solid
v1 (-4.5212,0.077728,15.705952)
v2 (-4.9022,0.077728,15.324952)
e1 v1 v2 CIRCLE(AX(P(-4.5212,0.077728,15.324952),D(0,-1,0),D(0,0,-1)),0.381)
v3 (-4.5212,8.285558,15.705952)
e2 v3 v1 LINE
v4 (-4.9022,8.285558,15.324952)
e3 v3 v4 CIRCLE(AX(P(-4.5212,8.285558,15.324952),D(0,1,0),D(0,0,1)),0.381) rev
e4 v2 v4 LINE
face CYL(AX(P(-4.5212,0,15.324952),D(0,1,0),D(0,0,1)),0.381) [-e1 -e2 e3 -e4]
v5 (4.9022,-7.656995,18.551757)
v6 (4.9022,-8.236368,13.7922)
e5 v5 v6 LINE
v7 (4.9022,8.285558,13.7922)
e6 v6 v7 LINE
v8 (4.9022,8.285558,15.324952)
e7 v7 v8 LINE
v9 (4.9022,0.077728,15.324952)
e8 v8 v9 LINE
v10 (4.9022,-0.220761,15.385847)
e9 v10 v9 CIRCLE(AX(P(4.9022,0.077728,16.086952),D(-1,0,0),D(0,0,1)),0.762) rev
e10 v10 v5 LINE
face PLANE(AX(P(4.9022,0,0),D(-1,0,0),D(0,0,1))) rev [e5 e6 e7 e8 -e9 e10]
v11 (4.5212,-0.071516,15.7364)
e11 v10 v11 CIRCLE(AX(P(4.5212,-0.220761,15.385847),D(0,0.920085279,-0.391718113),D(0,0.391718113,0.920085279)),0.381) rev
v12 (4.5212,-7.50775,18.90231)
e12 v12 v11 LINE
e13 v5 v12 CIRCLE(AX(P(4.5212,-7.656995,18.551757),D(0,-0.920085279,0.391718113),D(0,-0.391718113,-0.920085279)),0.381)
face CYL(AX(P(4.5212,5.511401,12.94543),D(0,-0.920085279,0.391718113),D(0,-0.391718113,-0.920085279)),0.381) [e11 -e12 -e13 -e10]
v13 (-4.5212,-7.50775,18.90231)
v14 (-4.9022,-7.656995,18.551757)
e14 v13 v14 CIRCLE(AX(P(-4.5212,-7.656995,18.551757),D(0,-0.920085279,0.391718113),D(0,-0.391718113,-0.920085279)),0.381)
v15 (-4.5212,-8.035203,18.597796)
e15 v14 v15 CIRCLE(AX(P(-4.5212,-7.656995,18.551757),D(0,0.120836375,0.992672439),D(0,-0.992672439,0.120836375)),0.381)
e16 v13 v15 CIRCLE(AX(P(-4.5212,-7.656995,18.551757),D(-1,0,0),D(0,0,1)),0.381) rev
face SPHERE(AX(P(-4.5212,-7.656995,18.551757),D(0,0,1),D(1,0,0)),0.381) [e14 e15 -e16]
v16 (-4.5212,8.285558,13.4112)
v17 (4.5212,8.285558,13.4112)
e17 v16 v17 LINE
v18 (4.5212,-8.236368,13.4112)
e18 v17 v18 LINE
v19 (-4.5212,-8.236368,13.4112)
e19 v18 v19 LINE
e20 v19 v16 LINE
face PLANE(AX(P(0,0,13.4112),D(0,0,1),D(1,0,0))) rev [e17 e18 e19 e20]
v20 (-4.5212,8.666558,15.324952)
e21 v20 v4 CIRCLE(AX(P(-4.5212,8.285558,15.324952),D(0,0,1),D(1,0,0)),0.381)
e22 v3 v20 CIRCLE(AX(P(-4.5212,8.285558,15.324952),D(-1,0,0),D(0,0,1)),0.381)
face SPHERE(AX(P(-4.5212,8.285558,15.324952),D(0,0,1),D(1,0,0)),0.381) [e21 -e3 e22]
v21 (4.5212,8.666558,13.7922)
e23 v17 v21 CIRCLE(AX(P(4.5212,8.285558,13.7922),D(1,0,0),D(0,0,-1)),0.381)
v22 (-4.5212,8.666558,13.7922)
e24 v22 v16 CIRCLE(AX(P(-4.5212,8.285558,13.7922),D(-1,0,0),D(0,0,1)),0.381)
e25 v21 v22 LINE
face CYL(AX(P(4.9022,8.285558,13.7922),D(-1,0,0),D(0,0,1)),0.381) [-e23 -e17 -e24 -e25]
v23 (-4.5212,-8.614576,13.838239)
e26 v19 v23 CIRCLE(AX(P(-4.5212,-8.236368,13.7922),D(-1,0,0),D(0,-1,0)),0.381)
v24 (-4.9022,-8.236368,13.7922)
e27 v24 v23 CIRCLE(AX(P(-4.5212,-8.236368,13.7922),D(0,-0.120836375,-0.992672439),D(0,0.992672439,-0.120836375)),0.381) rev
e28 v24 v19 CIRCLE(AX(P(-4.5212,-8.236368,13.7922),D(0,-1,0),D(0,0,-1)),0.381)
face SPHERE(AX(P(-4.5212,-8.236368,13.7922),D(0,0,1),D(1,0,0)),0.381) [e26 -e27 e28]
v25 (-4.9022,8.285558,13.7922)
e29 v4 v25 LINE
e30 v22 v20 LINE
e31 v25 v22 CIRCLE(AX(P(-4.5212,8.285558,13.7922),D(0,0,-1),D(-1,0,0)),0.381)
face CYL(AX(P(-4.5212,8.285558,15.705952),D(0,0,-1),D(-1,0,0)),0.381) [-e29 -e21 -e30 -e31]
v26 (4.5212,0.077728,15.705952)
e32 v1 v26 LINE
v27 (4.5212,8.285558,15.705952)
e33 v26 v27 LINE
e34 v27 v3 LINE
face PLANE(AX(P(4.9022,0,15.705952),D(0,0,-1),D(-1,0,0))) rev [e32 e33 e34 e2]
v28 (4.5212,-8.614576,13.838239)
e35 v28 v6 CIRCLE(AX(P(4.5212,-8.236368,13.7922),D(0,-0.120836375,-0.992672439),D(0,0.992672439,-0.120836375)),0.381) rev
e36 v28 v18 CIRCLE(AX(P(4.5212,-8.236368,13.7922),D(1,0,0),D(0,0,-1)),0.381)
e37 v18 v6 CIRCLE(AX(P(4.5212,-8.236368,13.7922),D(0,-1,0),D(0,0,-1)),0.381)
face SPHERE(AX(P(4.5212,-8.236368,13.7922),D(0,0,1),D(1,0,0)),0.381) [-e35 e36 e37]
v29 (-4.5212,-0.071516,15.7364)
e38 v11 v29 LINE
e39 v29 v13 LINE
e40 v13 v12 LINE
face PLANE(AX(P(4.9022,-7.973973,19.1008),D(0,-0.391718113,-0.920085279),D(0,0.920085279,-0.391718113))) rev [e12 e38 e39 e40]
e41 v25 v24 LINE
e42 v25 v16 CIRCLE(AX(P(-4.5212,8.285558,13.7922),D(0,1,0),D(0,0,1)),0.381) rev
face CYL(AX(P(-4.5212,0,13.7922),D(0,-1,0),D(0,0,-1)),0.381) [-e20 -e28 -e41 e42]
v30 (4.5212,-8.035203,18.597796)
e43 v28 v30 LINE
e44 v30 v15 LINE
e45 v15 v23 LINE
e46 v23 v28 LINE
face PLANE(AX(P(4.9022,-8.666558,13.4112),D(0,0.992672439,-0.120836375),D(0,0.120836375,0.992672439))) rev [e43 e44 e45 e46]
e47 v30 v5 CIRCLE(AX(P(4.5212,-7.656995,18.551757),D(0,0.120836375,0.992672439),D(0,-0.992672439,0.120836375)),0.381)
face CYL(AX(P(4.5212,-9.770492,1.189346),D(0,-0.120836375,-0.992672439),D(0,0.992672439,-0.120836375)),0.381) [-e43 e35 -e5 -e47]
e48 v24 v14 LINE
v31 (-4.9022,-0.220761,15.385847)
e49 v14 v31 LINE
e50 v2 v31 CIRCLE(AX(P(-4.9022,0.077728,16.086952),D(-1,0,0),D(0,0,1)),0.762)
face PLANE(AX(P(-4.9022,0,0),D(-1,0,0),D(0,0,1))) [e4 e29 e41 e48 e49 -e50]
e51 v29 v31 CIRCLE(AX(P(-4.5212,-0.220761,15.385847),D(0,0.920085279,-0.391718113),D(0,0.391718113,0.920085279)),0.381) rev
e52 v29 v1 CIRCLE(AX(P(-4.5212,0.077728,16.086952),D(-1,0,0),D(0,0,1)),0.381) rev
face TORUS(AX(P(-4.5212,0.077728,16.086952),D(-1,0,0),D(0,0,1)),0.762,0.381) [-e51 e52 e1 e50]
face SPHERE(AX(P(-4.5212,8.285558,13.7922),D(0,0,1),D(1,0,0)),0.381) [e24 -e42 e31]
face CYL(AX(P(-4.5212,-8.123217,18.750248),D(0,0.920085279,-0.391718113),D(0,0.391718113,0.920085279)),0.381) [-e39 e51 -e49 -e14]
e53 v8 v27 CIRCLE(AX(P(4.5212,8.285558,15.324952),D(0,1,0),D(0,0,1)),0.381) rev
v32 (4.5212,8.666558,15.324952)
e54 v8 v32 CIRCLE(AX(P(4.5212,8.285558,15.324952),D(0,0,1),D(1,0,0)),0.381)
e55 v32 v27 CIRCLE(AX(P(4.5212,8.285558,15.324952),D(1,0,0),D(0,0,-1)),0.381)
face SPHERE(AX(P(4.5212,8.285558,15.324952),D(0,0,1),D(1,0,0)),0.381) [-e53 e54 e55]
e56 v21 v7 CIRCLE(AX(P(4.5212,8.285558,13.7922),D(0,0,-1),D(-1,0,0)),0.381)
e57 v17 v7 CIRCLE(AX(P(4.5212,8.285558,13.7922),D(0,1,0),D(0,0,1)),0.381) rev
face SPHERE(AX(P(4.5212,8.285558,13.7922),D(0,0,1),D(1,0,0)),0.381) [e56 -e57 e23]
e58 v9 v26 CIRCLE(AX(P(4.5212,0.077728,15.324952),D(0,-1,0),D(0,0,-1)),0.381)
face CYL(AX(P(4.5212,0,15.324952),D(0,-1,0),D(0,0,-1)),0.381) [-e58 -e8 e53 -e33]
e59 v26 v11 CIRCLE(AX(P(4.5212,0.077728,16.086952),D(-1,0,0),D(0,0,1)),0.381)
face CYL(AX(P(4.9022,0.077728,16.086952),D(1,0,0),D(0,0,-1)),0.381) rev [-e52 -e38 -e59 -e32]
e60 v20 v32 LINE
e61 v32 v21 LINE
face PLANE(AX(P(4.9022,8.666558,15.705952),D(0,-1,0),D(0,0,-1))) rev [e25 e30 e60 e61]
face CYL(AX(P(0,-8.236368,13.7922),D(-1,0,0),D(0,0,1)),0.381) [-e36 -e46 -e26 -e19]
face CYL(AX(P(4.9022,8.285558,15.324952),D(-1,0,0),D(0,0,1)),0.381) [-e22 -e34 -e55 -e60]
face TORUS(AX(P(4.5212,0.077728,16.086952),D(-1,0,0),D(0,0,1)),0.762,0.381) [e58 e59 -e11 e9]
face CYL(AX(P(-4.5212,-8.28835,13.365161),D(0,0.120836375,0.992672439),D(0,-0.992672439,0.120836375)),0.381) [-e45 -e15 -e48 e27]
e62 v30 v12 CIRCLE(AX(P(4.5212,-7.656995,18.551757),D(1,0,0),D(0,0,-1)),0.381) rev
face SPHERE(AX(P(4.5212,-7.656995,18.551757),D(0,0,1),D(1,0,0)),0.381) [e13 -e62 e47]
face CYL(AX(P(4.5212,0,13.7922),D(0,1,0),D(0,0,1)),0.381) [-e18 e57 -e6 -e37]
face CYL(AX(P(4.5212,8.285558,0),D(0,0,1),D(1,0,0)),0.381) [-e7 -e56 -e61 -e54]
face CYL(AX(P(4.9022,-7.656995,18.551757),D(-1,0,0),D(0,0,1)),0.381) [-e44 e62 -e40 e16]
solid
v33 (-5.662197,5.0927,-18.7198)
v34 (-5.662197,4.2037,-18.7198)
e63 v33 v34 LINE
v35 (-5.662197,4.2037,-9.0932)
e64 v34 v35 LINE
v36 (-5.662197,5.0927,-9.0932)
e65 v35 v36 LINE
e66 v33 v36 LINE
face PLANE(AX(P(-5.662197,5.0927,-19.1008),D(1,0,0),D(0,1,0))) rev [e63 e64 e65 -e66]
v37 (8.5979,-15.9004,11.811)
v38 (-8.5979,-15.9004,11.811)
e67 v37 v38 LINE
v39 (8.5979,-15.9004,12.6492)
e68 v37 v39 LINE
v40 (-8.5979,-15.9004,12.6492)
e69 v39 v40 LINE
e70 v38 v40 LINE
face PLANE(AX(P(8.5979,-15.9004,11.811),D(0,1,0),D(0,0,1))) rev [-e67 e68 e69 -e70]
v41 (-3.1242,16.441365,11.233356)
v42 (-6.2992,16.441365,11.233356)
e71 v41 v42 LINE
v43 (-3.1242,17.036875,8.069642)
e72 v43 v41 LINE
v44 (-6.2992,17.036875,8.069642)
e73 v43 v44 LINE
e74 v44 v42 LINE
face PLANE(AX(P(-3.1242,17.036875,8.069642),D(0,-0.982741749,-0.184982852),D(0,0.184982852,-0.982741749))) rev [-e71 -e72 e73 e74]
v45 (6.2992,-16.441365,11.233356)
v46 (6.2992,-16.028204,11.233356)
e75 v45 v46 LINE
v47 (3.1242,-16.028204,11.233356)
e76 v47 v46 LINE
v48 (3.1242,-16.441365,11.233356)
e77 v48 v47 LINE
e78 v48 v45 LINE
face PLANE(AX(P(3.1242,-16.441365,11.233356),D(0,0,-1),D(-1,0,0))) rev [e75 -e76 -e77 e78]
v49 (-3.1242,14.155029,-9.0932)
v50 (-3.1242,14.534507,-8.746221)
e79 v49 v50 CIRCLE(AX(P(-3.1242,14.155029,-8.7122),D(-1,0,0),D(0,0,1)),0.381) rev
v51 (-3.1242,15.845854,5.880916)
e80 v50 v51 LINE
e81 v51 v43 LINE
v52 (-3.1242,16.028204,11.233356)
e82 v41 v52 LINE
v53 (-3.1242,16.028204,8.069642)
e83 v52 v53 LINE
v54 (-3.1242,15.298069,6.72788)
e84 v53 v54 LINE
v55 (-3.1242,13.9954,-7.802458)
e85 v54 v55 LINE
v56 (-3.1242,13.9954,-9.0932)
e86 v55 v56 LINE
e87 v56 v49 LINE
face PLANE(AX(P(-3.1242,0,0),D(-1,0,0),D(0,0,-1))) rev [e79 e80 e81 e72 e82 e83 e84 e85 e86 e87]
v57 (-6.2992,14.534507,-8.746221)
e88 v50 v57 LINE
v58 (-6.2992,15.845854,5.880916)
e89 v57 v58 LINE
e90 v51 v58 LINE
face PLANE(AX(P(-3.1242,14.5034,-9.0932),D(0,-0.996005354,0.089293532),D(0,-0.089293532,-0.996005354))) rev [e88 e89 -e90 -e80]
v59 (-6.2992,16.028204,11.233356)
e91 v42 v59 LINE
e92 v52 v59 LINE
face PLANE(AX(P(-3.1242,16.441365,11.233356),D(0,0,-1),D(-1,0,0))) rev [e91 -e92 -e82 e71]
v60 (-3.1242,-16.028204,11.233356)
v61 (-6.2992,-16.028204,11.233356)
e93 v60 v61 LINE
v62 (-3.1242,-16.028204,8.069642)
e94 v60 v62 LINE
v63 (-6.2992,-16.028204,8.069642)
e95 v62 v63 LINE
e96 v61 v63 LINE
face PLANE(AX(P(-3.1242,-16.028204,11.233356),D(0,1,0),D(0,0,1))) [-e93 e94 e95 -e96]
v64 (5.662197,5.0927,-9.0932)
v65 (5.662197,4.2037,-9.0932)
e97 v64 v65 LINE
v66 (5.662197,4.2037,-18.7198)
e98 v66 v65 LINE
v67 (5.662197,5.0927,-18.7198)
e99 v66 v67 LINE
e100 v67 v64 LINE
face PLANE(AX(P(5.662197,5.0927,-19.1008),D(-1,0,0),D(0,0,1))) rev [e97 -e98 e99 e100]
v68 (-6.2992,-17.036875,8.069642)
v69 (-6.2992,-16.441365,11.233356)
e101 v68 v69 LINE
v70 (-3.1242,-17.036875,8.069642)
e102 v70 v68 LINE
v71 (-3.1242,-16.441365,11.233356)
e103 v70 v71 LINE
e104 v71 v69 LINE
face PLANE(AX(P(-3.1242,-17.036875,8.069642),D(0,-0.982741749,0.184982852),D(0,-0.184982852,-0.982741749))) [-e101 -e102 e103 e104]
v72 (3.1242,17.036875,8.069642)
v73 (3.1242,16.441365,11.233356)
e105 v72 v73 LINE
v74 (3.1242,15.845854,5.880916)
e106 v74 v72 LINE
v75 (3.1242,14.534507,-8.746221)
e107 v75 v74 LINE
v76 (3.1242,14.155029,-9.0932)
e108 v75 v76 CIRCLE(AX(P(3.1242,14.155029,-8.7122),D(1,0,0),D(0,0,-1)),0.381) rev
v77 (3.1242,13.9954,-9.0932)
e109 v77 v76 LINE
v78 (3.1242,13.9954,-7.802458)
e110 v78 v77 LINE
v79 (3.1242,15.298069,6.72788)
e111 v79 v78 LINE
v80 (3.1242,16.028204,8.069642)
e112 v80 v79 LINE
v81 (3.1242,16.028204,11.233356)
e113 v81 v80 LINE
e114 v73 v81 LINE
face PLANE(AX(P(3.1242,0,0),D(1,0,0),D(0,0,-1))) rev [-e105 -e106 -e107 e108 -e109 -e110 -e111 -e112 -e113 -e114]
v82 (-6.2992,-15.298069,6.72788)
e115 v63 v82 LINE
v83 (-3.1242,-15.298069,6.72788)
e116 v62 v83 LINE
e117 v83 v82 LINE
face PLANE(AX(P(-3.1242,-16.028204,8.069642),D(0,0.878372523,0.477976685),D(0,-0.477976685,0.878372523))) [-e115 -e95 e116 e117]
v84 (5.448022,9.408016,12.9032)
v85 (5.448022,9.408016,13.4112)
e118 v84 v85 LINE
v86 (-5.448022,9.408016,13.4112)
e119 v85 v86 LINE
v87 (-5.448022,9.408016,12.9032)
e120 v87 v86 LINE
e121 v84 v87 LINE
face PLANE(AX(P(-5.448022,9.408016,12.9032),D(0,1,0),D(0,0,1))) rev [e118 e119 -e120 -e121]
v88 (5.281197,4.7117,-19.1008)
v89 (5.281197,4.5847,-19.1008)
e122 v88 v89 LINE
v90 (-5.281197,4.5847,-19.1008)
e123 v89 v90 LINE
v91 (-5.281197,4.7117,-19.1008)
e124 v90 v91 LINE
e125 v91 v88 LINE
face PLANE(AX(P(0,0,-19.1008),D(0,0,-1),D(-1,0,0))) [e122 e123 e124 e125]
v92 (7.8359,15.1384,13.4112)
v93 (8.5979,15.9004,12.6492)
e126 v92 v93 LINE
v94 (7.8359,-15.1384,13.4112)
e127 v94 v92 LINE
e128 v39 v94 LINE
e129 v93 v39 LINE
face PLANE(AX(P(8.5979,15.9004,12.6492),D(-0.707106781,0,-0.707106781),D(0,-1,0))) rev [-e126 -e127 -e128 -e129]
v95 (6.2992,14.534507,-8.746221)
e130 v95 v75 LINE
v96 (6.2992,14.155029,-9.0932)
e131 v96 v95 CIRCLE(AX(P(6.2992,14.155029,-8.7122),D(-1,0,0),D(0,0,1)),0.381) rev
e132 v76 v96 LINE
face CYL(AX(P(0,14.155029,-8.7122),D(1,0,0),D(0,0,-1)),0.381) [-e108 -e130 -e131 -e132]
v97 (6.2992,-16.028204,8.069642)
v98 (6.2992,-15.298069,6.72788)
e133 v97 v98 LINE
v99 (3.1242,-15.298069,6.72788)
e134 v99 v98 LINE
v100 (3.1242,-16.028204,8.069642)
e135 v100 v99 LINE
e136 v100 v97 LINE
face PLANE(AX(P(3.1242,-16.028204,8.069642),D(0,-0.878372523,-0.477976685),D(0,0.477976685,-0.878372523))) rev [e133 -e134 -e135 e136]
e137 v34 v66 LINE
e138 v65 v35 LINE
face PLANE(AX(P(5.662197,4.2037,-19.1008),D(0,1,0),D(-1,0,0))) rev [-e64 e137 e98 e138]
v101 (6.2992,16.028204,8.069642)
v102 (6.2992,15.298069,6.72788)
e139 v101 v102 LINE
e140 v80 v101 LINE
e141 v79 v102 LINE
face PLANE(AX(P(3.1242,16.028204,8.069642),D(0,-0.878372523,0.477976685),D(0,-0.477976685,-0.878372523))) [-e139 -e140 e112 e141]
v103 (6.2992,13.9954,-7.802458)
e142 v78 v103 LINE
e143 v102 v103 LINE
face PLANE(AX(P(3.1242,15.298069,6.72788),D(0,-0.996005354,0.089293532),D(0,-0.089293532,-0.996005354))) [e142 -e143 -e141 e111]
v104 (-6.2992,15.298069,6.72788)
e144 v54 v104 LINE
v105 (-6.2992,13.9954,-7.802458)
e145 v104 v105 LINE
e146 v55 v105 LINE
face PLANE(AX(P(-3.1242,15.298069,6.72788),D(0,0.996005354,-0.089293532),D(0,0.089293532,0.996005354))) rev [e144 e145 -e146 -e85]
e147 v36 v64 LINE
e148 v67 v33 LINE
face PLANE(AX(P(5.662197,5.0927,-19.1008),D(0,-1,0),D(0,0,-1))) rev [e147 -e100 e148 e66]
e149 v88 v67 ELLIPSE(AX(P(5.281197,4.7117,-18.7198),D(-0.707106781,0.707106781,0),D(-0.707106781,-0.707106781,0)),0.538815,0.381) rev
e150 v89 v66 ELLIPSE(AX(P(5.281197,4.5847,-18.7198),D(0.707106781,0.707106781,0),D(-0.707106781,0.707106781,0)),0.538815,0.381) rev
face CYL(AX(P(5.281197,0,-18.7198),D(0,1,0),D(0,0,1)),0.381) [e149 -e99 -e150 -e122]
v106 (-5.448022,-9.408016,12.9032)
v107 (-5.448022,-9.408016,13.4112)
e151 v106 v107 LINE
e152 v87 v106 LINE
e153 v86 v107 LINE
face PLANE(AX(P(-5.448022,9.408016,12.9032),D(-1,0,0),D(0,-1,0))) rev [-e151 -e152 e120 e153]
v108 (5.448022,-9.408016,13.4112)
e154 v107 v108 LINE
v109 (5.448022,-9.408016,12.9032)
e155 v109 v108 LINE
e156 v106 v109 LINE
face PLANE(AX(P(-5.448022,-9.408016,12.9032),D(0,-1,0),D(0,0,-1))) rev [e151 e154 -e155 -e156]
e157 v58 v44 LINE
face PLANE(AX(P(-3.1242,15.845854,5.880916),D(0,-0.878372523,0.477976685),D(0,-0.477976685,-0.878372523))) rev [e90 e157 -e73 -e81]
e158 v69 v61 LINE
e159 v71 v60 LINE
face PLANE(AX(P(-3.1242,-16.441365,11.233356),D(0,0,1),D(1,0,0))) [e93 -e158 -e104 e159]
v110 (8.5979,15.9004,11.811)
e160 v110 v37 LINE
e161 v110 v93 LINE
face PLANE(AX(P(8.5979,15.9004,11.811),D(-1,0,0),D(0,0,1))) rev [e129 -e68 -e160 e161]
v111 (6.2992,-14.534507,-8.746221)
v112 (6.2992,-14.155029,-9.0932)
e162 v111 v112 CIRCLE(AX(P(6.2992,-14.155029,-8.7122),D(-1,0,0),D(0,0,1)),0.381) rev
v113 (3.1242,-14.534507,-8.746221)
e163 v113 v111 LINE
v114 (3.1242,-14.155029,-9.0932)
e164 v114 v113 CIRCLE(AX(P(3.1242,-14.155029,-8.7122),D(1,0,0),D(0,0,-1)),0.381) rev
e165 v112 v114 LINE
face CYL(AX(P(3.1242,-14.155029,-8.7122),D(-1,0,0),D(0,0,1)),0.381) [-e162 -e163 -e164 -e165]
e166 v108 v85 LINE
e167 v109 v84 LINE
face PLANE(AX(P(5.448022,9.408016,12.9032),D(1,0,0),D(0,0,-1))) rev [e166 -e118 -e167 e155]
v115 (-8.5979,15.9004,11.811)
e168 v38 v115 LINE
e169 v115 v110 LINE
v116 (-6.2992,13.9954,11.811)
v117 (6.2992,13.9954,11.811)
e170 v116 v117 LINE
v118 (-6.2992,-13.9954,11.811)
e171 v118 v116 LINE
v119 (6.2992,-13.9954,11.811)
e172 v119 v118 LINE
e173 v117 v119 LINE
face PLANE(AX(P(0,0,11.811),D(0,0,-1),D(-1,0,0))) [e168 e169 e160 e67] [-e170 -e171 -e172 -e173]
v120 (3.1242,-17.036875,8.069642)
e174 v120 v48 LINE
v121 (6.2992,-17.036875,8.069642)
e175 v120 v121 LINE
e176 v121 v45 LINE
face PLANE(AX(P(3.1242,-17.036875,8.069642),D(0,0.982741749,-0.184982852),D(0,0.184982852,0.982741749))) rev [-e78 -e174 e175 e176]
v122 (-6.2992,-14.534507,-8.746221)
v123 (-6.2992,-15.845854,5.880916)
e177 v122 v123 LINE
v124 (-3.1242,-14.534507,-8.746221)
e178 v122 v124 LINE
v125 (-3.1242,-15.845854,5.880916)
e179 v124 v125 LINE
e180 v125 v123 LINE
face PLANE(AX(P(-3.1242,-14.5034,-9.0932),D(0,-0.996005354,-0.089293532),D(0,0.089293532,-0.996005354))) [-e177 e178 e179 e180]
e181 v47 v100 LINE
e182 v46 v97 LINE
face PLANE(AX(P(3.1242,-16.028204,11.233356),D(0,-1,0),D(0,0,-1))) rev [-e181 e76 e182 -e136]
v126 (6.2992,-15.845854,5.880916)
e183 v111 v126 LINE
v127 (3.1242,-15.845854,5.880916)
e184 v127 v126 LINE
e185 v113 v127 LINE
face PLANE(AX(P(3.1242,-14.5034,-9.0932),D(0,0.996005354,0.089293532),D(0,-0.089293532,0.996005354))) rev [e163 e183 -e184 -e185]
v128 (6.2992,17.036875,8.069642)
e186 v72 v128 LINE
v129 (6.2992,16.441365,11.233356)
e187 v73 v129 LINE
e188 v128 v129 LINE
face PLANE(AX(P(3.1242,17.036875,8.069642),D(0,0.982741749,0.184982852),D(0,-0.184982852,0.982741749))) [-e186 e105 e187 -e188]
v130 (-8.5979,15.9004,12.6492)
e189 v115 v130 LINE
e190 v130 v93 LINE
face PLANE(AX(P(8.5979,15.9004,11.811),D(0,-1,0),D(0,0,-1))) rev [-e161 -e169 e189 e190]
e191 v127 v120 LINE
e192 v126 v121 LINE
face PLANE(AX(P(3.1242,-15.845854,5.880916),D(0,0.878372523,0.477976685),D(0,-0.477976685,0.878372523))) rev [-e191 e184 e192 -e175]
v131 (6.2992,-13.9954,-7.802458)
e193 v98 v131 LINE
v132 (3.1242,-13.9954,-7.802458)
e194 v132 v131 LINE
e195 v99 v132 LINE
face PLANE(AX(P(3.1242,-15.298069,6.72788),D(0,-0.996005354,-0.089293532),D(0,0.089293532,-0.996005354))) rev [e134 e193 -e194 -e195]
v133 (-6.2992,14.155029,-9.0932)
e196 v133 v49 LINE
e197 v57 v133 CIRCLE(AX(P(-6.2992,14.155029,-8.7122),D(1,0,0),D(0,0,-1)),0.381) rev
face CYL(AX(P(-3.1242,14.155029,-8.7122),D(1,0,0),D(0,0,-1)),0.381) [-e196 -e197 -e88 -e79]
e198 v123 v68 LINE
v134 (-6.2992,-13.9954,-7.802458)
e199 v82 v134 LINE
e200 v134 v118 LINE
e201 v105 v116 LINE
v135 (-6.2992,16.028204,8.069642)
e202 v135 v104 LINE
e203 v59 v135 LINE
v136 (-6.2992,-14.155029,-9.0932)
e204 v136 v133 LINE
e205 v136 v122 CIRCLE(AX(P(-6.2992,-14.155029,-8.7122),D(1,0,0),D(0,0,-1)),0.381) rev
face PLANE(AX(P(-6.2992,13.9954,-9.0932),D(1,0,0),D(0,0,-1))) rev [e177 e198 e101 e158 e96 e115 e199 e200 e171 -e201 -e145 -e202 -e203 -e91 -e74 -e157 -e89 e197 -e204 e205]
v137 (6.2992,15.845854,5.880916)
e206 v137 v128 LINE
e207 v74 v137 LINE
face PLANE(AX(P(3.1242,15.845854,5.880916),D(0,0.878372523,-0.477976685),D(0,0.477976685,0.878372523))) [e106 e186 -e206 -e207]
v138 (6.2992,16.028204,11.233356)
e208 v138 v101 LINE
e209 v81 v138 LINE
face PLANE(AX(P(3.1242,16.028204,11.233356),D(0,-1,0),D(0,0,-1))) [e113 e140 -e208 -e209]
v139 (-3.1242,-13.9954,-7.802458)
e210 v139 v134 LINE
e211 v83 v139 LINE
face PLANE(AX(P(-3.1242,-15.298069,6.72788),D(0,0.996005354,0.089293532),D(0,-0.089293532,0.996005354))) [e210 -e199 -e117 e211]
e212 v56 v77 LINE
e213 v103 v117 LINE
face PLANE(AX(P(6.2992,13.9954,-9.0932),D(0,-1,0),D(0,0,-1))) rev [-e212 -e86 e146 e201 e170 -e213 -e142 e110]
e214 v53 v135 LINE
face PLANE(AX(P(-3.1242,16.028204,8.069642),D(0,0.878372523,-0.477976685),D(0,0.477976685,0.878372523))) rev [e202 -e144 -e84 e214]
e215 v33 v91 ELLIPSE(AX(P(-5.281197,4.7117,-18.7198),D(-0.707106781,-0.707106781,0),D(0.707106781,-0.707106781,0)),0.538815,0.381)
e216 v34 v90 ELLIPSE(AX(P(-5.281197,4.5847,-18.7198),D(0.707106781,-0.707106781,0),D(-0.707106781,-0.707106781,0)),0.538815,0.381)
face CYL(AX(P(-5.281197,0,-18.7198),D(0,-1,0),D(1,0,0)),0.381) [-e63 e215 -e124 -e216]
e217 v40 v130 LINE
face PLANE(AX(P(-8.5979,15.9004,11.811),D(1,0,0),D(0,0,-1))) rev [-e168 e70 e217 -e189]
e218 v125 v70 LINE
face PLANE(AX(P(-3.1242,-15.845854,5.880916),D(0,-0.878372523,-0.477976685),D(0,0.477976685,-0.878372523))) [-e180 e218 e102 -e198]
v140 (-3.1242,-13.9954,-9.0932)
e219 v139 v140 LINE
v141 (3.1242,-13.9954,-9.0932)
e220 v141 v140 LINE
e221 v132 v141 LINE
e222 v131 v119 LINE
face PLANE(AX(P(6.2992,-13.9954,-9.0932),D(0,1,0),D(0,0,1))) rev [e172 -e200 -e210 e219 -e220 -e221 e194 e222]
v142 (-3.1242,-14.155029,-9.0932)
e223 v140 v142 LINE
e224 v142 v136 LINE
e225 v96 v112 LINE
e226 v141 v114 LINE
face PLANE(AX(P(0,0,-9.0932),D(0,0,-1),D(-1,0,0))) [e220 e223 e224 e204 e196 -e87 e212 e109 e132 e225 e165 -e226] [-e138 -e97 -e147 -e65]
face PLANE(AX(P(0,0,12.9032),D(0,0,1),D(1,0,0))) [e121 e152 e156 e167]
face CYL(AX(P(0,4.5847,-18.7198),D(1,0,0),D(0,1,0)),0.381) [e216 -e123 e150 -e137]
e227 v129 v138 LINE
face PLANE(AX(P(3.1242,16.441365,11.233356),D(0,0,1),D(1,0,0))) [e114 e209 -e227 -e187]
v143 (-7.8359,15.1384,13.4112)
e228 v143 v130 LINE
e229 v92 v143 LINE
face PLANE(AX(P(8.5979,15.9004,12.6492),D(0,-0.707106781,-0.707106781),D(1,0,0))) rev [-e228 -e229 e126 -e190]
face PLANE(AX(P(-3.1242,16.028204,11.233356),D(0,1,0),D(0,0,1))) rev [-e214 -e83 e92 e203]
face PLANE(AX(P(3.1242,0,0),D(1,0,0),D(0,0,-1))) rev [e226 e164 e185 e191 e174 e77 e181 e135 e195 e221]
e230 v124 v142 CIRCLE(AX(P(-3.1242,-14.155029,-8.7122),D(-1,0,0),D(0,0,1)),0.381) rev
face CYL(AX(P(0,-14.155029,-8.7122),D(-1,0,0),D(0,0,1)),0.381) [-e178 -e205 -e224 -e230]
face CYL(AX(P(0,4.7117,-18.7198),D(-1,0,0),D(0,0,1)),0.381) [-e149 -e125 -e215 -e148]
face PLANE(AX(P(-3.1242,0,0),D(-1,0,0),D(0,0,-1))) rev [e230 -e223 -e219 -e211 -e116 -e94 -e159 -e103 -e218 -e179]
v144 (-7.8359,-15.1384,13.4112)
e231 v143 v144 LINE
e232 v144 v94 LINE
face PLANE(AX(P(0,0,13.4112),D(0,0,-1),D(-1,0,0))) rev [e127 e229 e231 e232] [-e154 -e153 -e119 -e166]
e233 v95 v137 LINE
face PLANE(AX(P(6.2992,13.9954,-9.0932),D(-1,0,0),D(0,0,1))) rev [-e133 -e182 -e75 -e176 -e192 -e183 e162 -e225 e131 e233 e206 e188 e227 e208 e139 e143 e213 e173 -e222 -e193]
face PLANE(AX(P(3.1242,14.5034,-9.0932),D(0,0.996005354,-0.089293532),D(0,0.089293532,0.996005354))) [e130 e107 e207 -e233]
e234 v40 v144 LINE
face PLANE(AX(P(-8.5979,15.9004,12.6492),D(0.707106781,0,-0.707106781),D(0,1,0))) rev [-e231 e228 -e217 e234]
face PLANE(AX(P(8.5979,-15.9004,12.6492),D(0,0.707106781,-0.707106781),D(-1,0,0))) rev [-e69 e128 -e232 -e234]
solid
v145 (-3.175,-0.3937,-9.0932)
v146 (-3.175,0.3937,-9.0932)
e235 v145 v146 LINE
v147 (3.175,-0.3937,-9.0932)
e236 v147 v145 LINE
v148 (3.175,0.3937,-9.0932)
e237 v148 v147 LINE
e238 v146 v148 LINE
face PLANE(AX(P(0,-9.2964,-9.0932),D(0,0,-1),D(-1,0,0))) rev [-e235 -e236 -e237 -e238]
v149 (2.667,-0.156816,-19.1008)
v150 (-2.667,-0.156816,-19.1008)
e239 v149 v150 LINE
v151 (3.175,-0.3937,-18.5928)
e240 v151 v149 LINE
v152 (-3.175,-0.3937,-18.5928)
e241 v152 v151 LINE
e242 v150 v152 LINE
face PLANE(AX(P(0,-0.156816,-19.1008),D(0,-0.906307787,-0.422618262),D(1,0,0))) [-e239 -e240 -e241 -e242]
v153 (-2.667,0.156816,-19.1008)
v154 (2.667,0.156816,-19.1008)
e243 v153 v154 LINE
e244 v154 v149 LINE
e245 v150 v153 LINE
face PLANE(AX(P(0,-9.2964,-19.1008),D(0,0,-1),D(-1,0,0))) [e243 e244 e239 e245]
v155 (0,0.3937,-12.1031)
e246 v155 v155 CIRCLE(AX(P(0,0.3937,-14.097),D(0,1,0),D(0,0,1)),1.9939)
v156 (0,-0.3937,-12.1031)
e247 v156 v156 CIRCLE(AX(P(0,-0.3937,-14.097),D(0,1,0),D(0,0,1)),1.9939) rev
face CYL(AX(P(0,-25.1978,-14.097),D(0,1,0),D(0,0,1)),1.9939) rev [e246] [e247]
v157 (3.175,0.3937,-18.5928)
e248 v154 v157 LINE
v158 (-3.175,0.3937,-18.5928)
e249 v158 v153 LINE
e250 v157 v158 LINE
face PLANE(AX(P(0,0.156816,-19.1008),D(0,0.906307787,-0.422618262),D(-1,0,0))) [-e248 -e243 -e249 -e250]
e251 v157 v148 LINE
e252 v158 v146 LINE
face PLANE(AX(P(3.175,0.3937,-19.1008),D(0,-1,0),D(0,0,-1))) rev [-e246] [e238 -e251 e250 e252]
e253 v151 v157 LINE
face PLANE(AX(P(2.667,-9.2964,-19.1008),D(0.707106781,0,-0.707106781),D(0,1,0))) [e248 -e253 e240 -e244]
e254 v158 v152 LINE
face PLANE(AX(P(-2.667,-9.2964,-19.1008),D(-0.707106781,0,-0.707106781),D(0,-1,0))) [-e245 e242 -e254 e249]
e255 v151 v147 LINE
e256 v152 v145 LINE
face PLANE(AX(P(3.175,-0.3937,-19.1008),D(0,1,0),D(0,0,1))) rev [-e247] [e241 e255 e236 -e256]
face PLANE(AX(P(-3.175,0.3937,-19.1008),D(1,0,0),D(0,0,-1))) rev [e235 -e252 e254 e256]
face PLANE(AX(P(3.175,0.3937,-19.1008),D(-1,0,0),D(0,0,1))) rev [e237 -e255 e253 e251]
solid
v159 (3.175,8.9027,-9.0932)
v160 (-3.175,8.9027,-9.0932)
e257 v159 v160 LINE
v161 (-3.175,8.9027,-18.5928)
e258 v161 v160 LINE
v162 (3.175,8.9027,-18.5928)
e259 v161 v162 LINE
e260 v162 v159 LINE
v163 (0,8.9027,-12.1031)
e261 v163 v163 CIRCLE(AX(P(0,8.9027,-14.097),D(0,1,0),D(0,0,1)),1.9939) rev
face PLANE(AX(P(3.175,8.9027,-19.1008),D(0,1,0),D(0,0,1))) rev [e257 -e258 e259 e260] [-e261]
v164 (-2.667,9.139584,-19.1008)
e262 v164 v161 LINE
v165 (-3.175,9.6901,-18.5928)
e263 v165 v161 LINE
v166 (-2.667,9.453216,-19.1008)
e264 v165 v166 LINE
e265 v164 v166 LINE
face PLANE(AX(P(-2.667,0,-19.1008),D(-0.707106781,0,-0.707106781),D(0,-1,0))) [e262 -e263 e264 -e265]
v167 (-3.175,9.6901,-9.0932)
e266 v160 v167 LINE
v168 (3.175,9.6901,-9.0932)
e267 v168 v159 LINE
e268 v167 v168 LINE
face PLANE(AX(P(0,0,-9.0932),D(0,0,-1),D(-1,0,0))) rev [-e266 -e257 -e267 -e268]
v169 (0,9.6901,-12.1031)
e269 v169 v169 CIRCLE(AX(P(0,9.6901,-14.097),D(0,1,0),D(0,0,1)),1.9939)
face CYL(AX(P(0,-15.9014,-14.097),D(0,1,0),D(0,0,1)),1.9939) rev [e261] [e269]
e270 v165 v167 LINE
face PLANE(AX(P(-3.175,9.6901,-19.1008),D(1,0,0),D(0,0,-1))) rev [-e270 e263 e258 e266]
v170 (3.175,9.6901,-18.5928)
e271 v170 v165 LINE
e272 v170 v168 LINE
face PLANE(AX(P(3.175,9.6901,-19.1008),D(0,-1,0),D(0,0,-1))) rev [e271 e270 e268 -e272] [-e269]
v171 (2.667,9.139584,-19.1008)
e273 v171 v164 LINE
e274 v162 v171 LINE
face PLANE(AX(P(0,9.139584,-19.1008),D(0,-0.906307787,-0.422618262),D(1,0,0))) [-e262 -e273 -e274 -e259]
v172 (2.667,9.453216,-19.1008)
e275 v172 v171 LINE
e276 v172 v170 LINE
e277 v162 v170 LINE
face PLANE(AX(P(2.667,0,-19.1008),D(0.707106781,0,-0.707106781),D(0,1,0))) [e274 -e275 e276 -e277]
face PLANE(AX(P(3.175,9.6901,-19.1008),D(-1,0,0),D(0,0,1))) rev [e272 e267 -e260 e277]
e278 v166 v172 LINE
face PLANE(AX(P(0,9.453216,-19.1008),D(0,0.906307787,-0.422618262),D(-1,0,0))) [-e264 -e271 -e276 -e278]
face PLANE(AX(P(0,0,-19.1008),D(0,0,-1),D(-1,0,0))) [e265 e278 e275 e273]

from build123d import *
from OCP.BRepFilletAPI import BRepFilletAPI_MakeChamfer

# Parameters (mm, degrees)
BOSS_EXTRUDE1_DEPTH  = 4.9022
SKETCH3_W            = 17.1958
SKETCH3_H            = 31.8008
BOSS_EXTRUDE2_DEPTH  = 1.6002
CHAMFER1_SIZE        = 0.762
SKETCH4_W            = 10.896044092
SKETCH4_H            = 18.816032884
CUT_EXTRUDE2_DEPTH   = 0.508
SKETCH5_W            = 12.5984
SKETCH5_H            = 27.9908
BOSS_EXTRUDE3_DEPTH  = 20.9042
SKETCH6_W            = 6.35
SKETCH6_H            = 0.7874
BOSS_EXTRUDE4_DEPTH  = 10.0076
CHAMFER2_SIZE        = 0.508
CHAMFER3_SIZE        = 0.508
CHAMFER3_SIZE2       = 0.23688429
SKETCH7_R            = 1.9939
CUT_EXTRUDE3_DEPTH   = 0.7874
LPATTERN1_COUNT      = 2
LPATTERN1_PITCH      = 9.2964
SKETCH9_W            = 11.324393704
SKETCH9_H            = 0.889
BOSS_EXTRUDE5_DEPTH  = 10.0076
FILLET1_R            = 0.381
BOSS_EXTRUDE6_DEPTH  = 3.175
FILLET2_R            = 0.381
FILLET2_OF_MIRROR3_R = 0.381
MIRROR4_START        = -6.2992
MIRROR4_DEPTH        = 3.175
MIRROR4_START_2      = 3.1242
MIRROR4_2_DEPTH      = 3.175
FILLET3_R            = 0.381


# Read off the part's stored shape, not the designer's step: Mirror4
with BuildPart() as part:
    # Sketch2 → Boss-Extrude1 (new, symmetric)
    with BuildSketch(Plane(origin=(0, 0, 0), x_dir=(0, 0, -1), z_dir=(1, 0, 0))):
        Polygon((-19.1008, -7.973972857), (-15.705952073, 0), (-15.705952073, 8.666558462), (-13.4112, 8.666558462), (-13.4112, -8.666558462), align=None)
    extrude(amount=BOSS_EXTRUDE1_DEPTH, both=True)

    # Sketch3 → Boss-Extrude2 (add)
    with BuildSketch(Plane(origin=(0, 0, 13.4112), x_dir=(-1, 0, 0), z_dir=(0, 0, -1))):
        Rectangle(SKETCH3_W, SKETCH3_H)
    extrude(amount=BOSS_EXTRUDE2_DEPTH)

    # Chamfer1
    chamfer1_edges = [part.edges().sort_by_distance(p)[0] for p in [
        (-8.5979, 0, 13.4112),
        (0, 15.9004, 13.4112),
        (8.5979, 0, 13.4112),
        (0, -15.9004, 13.4112),
    ]]
    chamfer(chamfer1_edges, length=CHAMFER1_SIZE)

    # Sketch4 → Cut-Extrude2 (cut)
    with BuildSketch(Plane.XY.offset(13.4112)):
        Rectangle(SKETCH4_W, SKETCH4_H)
    extrude(amount=-CUT_EXTRUDE2_DEPTH, mode=Mode.SUBTRACT)


with BuildPart() as cut_extrude2_piece_1:
    # of the separate pieces the step leaves, piece 1, a body of its own (cut_extrude2_pieces)
    add(part.part.solids().sort_by_distance((8.5979, 15.9004, 12.6492))[0])

    # Sketch5 → Boss-Extrude3 (add)
    with BuildSketch(Plane(origin=(0, 0, 11.811), x_dir=(-1, 0, 0), z_dir=(0, 0, -1))):
        Rectangle(SKETCH5_W, SKETCH5_H)
    extrude(amount=BOSS_EXTRUDE3_DEPTH)

    # Sketch9 → Boss-Extrude5 (add)
    with BuildSketch(Plane(origin=(0, 0, -9.0932), x_dir=(-1, 0, 0), z_dir=(0, 0, -1))):
        with Locations((0, 4.6482)):
            Rectangle(SKETCH9_W, SKETCH9_H)
    extrude(amount=BOSS_EXTRUDE5_DEPTH)

    # Fillet1
    fillet1_edges = [cut_extrude2_piece_1.edges().sort_by_distance(p)[0] for p in [
        (-5.662196852, 4.6482, -19.1008),
        (0, 5.0927, -19.1008),
        (5.662196852, 4.6482, -19.1008),
        (0, 4.2037, -19.1008),
    ]]
    fillet(fillet1_edges, radius=FILLET1_R)

    # Sketch11 → Boss-Extrude6 (add)
    with BuildSketch(Plane(origin=(6.2992, 0, 0), x_dir=(0, 0, -1), z_dir=(1, 0, 0))):
        Polygon((9.0932, 13.9954), (9.0932, 14.5034), (-5.880915867, 15.845854324), (-8.069641774, 17.036875135), (-11.233356301, 16.44136473), (-11.233356301, 16.028204475), (-8.069641774, 16.028204475), (-6.727879648, 15.298068915), (7.80245849, 13.9954), align=None)
    boss_extrude6 = extrude(amount=-BOSS_EXTRUDE6_DEPTH)

    # Fillet2
    fillet2_edges = [cut_extrude2_piece_1.edges().sort_by_distance(p)[0] for p in [
        (4.7117, 14.5034, -9.0932),
    ]]
    fillet(fillet2_edges, radius=FILLET2_R)

    # Mirror3: Boss-Extrude6 across plane
    add(boss_extrude6.mirror(Plane(origin=(0, 0, 0), x_dir=(0, 0, 1), z_dir=(1, 0, 0))))

    # Fillet2 of Mirror3
    fillet2_of_mirror3_edges = [cut_extrude2_piece_1.edges().sort_by_distance(p)[0] for p in [
        (-4.7117, 14.5034, -9.0932),
    ]]
    fillet(fillet2_of_mirror3_edges, radius=FILLET2_OF_MIRROR3_R)

    # Mirror4 outline → Mirror4 (add)
    with BuildSketch(Plane.YZ.offset(MIRROR4_START)):
        with BuildLine():
            Line((-16.028204475, 8.069641774), (-16.028204475, 11.233356301))
            Line((-16.028204475, 11.233356301), (-16.44136473, 11.233356301))
            Line((-16.44136473, 11.233356301), (-17.036875135, 8.069641774))
            Line((-17.036875135, 8.069641774), (-15.845854324, 5.880915867))
            Line((-15.845854324, 5.880915867), (-14.534507258, -8.746220836))
            ThreePointArc((-14.534507258, -8.746220836), (-14.412127508, -8.993378714), (-14.155029218, -9.0932))
            Line((-14.155029218, -9.0932), (-13.9954, -9.0932))
            Line((-13.9954, -9.0932), (-13.9954, -7.80245849))
            Line((-13.9954, -7.80245849), (-15.298068915, 6.727879648))
            Line((-15.298068915, 6.727879648), (-16.028204475, 8.069641774))
        make_face()
    extrude(amount=MIRROR4_DEPTH)

    # Mirror4 2 outline → Mirror4 2 (add)
    with BuildSketch(Plane.YZ.offset(MIRROR4_START_2)):
        with BuildLine():
            Line((-16.028204475, 8.069641774), (-16.028204475, 11.233356301))
            Line((-16.028204475, 11.233356301), (-16.44136473, 11.233356301))
            Line((-16.44136473, 11.233356301), (-17.036875135, 8.069641774))
            Line((-17.036875135, 8.069641774), (-15.845854324, 5.880915867))
            Line((-15.845854324, 5.880915867), (-14.534507258, -8.746220836))
            ThreePointArc((-14.534507258, -8.746220836), (-14.412127508, -8.993378714), (-14.155029218, -9.0932))
            Line((-14.155029218, -9.0932), (-13.9954, -9.0932))
            Line((-13.9954, -9.0932), (-13.9954, -7.80245849))
            Line((-13.9954, -7.80245849), (-15.298068915, 6.727879648))
            Line((-15.298068915, 6.727879648), (-16.028204475, 8.069641774))
        make_face()
    extrude(amount=MIRROR4_2_DEPTH)


with BuildPart() as cut_extrude2_piece_2:
    # of the separate pieces the step leaves, piece 2, a body of its own (cut_extrude2_pieces)
    add(part.part.solids().sort_by_distance((-4.9022, 8.666558462, 15.705952073))[0])

    # Fillet3
    fillet3_edges = [cut_extrude2_piece_2.edges().sort_by_distance(p)[0] for p in [
        (4.9022, 8.666558462, 14.558576037),
        (4.9022, 4.333279231, 15.705952073),
        (4.9022, -3.986986428, 17.403376037),
        (4.9022, -8.320265659, 16.256),
        (-4.9022, -3.986986428, 17.403376037),
        (-4.9022, 4.333279231, 15.705952073),
        (-4.9022, 8.666558462, 14.558576037),
        (-4.9022, 0, 13.4112),
        (-4.9022, -8.320265659, 16.256),
        (4.9022, 0, 13.4112),
        (0, -7.973972857, 19.1008),
        (0, 0, 15.705952073),
        (0, 8.666558462, 15.705952073),
        (0, 8.666558462, 13.4112),
        (0, -8.666558462, 13.4112),
    ]]
    fillet(fillet3_edges, radius=FILLET3_R)


with BuildPart() as body_3:
    # Sketch6 → Boss-Extrude4 (new body)
    with BuildSketch(Plane(origin=(0, 0, -9.0932), x_dir=(-1, 0, 0), z_dir=(0, 0, -1))):
        with Locations((0, 9.2964)):
            Rectangle(SKETCH6_W, SKETCH6_H)
    extrude(amount=BOSS_EXTRUDE4_DEPTH)

    # Chamfer2
    chamfer2_edges = [body_3.edges().sort_by_distance(p)[0] for p in [
        (3.175, 9.2964, -19.1008),
        (-3.175, 9.2964, -19.1008),
    ]]
    chamfer(chamfer2_edges, length=CHAMFER2_SIZE)

    # Chamfer3: one chamfer whose edges measure the first distance from different faces: ONE call of the kernel's chamfer builder (chamfer() names one face for all edges)
    chamfer3_edges_1 = [body_3.edges().sort_by_distance(p)[0] for p in [
        (0, 8.9027, -19.1008),
    ]]
    chamfer3_side_1 = [body_3.faces().sort_by_distance(p)[0] for p in [
        (0, 8.9027, -14.077287598),
    ]]
    chamfer3_edges_2 = [body_3.edges().sort_by_distance(p)[0] for p in [
        (0, 9.6901, -19.1008),
    ]]
    chamfer3_side_2 = [body_3.faces().sort_by_distance(p)[0] for p in [
        (0, 9.6901, -14.077287598),
    ]]
    chamfer3 = BRepFilletAPI_MakeChamfer(body_3.part.solid().wrapped)
    for e in chamfer3_edges_1:
        chamfer3.Add(CHAMFER3_SIZE, CHAMFER3_SIZE2, e.wrapped, chamfer3_side_1[0].wrapped)  # the first distance lies on this face
    for e in chamfer3_edges_2:
        chamfer3.Add(CHAMFER3_SIZE, CHAMFER3_SIZE2, e.wrapped, chamfer3_side_2[0].wrapped)  # the first distance lies on this face
    add(Compound.cast(chamfer3.Shape()), mode=Mode.REPLACE)

    # Sketch7 → Cut-Extrude3 (cut)
    with BuildSketch(Plane(origin=(0, 9.6901, 0), x_dir=(1, 0, 0), z_dir=(0, 1, 0))):
        with Locations(Location((0, 14.097, 0), (0, 0, 270))):
            Circle(SKETCH7_R)
    extrude(amount=-CUT_EXTRUDE3_DEPTH, mode=Mode.SUBTRACT)


with BuildPart() as lpattern1_1:
    # LPattern1: pattern copy
    add(body_3.part.moved(Location(Vector(0, -1, 0) * (1 * LPATTERN1_PITCH))))


solid = Compound([cut_extrude2_piece_1.part, cut_extrude2_piece_2.part, body_3.part, lpattern1_1.part])
